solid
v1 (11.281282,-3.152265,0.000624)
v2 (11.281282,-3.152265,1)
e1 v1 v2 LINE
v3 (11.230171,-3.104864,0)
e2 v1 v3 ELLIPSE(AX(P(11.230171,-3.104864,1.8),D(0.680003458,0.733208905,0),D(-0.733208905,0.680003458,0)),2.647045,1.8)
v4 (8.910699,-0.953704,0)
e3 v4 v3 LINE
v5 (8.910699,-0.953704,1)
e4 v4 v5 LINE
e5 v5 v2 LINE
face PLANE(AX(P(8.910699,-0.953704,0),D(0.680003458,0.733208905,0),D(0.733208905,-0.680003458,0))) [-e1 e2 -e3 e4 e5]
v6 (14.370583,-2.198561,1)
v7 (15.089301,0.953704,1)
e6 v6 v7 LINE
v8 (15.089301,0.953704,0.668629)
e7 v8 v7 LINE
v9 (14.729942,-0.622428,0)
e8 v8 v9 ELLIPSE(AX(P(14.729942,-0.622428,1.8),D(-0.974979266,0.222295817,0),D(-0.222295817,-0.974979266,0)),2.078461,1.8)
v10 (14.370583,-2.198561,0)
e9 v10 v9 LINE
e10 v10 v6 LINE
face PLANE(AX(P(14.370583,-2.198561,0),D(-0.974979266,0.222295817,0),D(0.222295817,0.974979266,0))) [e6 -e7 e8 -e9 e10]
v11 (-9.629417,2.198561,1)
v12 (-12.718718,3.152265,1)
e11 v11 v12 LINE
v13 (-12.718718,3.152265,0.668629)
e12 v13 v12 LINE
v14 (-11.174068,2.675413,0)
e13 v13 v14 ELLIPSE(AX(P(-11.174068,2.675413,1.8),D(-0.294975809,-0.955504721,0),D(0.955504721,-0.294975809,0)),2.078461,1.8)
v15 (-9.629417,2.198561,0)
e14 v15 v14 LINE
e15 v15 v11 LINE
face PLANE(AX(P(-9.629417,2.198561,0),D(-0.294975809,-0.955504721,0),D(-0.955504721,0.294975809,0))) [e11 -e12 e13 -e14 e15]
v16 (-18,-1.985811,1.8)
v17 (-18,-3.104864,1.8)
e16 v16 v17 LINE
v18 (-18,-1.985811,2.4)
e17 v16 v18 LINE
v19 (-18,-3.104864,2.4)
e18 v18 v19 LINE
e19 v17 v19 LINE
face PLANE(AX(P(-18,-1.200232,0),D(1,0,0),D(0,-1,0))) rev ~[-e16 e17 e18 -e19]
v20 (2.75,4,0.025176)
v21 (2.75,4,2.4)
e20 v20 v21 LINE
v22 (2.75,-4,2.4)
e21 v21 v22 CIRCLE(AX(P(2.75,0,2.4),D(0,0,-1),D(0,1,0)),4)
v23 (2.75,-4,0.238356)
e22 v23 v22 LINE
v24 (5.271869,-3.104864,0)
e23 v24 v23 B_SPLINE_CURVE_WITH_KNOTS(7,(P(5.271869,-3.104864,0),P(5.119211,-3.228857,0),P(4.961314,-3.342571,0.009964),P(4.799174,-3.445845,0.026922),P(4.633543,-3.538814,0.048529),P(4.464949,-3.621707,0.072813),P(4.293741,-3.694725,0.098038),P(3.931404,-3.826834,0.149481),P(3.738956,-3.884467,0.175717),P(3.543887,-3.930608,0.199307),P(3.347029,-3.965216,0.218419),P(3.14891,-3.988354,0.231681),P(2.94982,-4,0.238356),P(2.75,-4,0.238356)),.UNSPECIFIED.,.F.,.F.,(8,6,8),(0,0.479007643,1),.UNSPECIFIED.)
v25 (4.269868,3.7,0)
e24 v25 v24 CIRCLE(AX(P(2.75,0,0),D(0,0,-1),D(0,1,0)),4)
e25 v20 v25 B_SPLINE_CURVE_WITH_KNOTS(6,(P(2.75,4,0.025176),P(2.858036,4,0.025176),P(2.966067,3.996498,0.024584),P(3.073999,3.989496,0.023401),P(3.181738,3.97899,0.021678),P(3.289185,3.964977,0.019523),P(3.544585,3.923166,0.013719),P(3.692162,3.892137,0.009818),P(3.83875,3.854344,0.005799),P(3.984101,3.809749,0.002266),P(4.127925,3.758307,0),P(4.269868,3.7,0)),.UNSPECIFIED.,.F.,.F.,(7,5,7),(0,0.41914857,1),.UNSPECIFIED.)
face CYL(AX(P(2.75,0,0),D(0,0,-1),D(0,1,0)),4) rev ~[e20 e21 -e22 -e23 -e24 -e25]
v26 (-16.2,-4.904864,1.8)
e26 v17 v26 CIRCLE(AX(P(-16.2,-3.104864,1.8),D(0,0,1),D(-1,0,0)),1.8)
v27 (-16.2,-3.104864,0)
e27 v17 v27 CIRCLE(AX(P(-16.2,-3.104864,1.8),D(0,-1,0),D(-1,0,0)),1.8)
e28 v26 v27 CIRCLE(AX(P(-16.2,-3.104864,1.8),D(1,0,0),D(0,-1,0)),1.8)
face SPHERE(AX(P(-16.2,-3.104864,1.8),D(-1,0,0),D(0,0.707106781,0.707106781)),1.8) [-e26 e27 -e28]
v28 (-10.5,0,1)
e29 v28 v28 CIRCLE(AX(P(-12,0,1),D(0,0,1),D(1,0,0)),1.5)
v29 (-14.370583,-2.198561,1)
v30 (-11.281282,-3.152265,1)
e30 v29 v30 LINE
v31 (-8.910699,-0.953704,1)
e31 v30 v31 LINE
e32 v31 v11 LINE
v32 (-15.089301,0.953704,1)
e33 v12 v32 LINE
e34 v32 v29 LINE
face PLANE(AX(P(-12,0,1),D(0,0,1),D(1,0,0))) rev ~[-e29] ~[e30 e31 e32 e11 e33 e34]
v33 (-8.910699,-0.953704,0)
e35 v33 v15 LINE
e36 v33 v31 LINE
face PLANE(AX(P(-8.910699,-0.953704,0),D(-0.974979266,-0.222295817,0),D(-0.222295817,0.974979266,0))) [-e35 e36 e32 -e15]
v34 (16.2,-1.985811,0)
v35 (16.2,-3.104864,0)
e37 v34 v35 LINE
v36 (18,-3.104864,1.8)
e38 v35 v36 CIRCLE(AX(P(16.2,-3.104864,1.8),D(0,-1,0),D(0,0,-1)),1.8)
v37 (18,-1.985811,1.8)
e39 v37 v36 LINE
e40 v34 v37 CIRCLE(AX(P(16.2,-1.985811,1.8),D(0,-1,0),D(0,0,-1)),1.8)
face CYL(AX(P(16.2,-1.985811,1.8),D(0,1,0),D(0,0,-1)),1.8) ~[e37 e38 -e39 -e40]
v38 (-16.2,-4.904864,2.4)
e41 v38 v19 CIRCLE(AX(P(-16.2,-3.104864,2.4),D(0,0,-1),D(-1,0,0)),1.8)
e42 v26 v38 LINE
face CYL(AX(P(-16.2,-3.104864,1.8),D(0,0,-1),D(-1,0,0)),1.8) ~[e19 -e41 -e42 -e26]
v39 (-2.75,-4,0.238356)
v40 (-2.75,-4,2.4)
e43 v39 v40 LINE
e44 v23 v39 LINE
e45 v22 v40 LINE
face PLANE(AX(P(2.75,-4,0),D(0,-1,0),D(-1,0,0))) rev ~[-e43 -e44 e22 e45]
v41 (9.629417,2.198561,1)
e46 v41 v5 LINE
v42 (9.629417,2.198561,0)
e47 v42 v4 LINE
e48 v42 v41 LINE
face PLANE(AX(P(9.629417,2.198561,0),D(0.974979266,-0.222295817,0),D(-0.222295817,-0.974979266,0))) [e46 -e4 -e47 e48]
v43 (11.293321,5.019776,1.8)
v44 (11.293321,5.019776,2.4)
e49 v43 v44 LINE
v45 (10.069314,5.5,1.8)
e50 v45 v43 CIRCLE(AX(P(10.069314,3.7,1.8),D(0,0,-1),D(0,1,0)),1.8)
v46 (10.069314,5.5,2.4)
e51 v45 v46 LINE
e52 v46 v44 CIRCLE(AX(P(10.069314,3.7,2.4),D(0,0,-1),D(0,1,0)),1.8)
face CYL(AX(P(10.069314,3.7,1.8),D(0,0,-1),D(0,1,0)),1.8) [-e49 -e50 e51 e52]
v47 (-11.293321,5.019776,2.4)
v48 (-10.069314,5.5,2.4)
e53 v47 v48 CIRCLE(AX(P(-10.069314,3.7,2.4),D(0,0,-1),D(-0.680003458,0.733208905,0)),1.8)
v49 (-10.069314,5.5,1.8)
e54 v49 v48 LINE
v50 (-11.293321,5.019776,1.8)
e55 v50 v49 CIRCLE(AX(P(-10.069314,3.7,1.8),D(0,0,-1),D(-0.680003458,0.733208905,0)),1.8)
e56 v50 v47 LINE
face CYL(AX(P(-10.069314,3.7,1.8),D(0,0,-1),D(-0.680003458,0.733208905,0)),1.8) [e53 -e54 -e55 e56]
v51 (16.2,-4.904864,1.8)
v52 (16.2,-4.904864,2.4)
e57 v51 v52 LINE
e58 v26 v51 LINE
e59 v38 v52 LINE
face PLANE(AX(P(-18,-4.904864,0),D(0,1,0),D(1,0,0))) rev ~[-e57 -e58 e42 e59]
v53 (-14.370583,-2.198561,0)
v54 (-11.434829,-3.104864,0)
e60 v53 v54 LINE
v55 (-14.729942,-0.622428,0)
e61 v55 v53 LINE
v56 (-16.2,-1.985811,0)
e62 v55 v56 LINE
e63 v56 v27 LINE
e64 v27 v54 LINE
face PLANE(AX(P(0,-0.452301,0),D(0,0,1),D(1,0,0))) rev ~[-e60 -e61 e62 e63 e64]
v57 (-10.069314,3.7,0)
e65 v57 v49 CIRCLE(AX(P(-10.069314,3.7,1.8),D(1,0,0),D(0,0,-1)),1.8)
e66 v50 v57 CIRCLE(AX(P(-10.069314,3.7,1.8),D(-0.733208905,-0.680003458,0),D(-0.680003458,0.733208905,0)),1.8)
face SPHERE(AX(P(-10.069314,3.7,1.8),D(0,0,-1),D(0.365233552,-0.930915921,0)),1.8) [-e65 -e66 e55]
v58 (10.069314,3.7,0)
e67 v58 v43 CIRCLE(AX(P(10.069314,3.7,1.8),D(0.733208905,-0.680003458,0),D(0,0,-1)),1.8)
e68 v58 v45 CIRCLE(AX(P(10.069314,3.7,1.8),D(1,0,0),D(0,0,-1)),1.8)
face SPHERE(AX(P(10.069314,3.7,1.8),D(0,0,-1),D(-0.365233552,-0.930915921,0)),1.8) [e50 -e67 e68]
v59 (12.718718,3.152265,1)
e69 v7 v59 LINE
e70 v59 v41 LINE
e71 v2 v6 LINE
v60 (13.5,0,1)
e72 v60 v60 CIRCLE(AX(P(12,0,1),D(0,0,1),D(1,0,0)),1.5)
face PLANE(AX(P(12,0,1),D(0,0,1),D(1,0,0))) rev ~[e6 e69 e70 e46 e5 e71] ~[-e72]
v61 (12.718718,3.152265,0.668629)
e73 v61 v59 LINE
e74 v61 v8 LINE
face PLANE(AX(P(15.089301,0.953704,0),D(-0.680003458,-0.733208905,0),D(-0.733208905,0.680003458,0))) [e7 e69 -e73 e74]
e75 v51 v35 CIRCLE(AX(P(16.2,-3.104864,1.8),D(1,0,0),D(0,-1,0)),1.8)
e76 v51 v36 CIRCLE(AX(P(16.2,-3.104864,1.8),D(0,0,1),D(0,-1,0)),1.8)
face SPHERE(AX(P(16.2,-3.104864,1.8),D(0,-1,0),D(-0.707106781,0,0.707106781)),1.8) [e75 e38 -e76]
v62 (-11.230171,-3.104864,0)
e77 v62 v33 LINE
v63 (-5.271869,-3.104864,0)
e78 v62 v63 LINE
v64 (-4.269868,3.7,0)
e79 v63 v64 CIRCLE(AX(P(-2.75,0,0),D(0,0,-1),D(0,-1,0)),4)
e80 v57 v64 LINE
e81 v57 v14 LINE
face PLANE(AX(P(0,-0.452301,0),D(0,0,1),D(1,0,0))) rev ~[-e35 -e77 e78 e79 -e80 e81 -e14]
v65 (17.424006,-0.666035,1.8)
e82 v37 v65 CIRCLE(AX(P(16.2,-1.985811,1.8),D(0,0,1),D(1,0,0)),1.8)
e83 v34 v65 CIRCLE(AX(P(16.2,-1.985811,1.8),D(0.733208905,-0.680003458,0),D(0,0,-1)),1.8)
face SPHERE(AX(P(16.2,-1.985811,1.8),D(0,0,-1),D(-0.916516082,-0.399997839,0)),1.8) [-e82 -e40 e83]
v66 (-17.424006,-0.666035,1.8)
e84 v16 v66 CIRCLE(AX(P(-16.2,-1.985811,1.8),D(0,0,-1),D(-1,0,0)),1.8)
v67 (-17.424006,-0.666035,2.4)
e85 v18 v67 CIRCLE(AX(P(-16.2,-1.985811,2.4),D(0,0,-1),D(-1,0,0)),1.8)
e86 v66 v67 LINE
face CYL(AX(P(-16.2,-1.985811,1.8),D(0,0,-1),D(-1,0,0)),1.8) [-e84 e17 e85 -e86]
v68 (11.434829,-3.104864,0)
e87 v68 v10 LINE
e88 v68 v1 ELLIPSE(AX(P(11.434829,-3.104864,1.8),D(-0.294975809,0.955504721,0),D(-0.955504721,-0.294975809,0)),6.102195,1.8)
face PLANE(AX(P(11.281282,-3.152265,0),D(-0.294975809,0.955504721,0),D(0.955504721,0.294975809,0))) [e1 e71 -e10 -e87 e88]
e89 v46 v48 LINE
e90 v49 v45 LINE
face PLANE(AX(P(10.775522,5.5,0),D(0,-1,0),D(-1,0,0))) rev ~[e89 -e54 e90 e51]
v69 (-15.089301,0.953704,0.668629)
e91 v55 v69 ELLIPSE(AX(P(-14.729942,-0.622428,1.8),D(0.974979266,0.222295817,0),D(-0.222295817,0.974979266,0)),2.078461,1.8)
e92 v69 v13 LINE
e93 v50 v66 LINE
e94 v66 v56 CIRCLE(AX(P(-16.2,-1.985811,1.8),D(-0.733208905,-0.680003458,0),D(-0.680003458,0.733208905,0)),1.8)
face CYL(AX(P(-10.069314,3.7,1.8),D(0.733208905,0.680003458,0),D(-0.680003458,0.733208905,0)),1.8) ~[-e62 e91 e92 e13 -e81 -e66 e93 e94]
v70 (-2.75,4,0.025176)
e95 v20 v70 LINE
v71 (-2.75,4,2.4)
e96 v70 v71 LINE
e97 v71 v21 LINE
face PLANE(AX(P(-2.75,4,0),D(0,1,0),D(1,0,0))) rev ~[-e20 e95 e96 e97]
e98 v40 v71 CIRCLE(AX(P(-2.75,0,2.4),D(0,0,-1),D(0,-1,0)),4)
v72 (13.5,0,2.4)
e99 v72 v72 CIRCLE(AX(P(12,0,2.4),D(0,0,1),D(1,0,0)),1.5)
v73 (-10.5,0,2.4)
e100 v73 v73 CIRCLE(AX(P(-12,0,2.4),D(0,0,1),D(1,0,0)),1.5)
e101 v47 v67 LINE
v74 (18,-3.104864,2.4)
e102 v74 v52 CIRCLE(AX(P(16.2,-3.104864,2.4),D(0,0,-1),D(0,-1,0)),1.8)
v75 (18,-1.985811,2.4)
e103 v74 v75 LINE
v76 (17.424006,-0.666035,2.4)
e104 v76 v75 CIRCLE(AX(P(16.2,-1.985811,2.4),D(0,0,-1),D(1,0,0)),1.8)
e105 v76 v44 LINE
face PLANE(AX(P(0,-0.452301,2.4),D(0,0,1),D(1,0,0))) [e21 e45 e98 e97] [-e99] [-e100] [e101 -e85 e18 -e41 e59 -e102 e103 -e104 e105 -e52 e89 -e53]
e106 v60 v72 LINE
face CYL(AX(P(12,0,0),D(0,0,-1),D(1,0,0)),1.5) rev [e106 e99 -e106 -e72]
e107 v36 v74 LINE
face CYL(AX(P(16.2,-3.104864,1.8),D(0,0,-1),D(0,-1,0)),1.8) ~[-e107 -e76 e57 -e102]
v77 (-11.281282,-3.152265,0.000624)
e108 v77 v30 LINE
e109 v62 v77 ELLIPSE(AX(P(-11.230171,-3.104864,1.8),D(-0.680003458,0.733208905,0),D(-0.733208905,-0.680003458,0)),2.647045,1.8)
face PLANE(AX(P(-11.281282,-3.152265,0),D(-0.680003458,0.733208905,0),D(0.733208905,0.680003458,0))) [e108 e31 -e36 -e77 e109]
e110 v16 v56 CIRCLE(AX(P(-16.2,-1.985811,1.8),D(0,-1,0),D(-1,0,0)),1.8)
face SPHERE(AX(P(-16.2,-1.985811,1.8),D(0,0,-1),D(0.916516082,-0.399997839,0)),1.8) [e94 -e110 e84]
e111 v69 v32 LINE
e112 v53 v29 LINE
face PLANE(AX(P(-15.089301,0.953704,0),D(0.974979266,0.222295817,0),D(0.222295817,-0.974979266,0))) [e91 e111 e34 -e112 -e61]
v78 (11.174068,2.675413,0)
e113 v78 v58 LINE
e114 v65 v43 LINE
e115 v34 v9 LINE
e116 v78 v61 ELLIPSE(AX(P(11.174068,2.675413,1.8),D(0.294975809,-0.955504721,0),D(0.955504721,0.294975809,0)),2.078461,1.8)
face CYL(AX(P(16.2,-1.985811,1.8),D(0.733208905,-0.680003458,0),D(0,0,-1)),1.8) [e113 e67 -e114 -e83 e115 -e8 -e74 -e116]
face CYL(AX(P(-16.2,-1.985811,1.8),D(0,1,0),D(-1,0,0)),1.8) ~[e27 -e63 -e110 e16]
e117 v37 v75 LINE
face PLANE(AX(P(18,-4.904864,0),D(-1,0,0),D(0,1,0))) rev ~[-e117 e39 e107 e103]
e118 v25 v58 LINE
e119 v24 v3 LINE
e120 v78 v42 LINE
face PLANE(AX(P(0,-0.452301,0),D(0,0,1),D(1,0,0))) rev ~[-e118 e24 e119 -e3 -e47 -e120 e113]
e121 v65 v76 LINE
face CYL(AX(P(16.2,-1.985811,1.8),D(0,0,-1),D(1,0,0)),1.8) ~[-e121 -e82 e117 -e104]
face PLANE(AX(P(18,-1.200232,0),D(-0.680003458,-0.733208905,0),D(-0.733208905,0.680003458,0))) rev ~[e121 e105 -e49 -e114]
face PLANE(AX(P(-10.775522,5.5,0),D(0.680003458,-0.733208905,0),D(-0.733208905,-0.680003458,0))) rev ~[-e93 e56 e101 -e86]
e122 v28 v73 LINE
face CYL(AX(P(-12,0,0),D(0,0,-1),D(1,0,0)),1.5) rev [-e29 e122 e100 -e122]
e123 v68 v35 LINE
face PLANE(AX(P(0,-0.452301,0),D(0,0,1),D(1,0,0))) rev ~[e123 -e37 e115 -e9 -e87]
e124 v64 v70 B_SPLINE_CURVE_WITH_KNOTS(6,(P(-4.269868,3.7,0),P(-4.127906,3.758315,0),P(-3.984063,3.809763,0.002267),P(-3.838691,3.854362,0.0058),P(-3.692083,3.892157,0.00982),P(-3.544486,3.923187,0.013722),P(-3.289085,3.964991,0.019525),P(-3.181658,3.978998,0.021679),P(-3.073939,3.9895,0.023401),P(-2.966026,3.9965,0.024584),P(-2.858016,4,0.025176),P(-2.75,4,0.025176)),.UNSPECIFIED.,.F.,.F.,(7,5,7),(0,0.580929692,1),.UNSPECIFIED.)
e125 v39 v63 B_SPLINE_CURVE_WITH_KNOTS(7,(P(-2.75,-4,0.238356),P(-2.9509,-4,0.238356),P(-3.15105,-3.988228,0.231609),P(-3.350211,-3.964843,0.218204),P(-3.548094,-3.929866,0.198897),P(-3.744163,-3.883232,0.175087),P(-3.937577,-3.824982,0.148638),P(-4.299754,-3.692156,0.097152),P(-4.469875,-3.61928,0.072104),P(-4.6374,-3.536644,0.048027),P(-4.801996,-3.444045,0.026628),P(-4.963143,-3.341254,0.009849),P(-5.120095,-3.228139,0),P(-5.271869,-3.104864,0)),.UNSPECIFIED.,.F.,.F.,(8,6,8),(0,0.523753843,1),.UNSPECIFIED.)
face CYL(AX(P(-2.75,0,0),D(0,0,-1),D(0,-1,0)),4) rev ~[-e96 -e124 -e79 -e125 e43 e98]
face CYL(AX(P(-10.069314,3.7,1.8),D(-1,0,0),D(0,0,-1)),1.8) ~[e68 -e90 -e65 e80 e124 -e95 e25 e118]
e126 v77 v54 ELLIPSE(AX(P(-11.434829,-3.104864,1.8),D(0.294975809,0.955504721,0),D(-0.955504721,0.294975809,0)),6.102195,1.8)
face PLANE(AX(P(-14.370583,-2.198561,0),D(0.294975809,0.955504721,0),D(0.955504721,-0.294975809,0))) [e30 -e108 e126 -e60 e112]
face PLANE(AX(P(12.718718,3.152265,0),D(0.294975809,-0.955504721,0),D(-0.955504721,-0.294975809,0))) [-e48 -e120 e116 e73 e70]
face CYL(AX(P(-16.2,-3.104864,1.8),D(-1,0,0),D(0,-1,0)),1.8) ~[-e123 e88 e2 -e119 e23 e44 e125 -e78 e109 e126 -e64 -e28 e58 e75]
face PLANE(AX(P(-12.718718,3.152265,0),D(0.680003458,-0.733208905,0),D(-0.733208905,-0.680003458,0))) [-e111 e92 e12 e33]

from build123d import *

# Parameters (mm, degrees)
F0_R         = 1.5
F1_DEPTH     = 2.4
F2_DEPTH     = 1
F3_T1_DEPTH  = 1.1190522621
F3_T3_DEPTH  = 32.4
F3_T5_DEPTH  = 20.138628613
F3_T7_DEPTH  = 2.365520331
F3_T9_DEPTH  = 8.3614446785
F3_T11_DEPTH = 8.3614446785
F3_T13_DEPTH = 5.1
F3_T15_DEPTH = 2.5639483811
F3_T20_DEPTH = 1.8
F3_S25_W     = 1.8
F3_S25_H     = 1.8
F3_T26_DEPTH = 1.8
F3_S31_W     = 1.8
F3_S31_H     = 1.8
F3_T32_DEPTH = 1.8
F3_T38_DEPTH = 1.8
F3_T44_DEPTH = 1.8
F3_T50_DEPTH = 1.8


# Not quite as in the source:
# - a fillet or chamfer that OpenCascade refuses, or shapes differently, is made with other operations: its cross-section is extruded or revolved along the edge and cut away or added


with BuildPart() as f1:
    # F0 (on Top) → F1 (new body)
    with BuildSketch(Plane.XY):
        Polygon((-18, -1.2002319389), (-18, -4.9048635534), (18, -4.9048635534), (18, -1.2002319389), (10.7755224389, 5.5), (-10.7755224389, 5.5), align=None)
        Polygon((-9.6294171928, 2.1985610038), (-8.9106989153, -0.9537044309), (-11.2812817225, -3.1522654347), (-14.3705828072, -2.1985610038), (-15.0893010847, 0.9537044309), (-12.7187182775, 3.1522654347), align=None, mode=Mode.SUBTRACT)
        with BuildLine():
            ThreePointArc((-2.75, -4), (-6.75, 0), (-2.75, 4))
            Line((-2.75, 4), (2.75, 4))
            ThreePointArc((2.75, 4), (6.75, 0), (2.75, -4))
            Line((2.75, -4), (-2.75, -4))
        make_face(mode=Mode.SUBTRACT)
        Polygon((9.6294171928, 2.1985610038), (12.7187182775, 3.1522654347), (15.0893010847, 0.9537044309), (14.3705828072, -2.1985610038), (11.2812817225, -3.1522654347), (8.9106989153, -0.9537044309), align=None, mode=Mode.SUBTRACT)
        Polygon((-11.2812817225, -3.1522654347), (-8.9106989153, -0.9537044309), (-9.6294171928, 2.1985610038), (-12.7187182775, 3.1522654347), (-15.0893010847, 0.9537044309), (-14.3705828072, -2.1985610038), align=None)
        with Locations((-12, 0)):
            Circle(F0_R, mode=Mode.SUBTRACT)
        Polygon((15.0893010847, 0.9537044309), (12.7187182775, 3.1522654347), (9.6294171928, 2.1985610038), (8.9106989153, -0.9537044309), (11.2812817225, -3.1522654347), (14.3705828072, -2.1985610038), align=None)
        with Locations((12, 0)):
            Circle(F0_R, mode=Mode.SUBTRACT)
    extrude(amount=F1_DEPTH)

    # F0 (on Top) → F2 (cut)
    with BuildSketch(Plane.XY):
        Polygon((15.0893010847, 0.9537044309), (12.7187182775, 3.1522654347), (9.6294171928, 2.1985610038), (8.9106989153, -0.9537044309), (11.2812817225, -3.1522654347), (14.3705828072, -2.1985610038), align=None)
        with Locations((12, 0)):
            Circle(F0_R, mode=Mode.SUBTRACT)
        Polygon((-11.2812817225, -3.1522654347), (-8.9106989153, -0.9537044309), (-9.6294171928, 2.1985610038), (-12.7187182775, 3.1522654347), (-15.0893010847, 0.9537044309), (-14.3705828072, -2.1985610038), align=None)
        with Locations((-12, 0)):
            Circle(F0_R, mode=Mode.SUBTRACT)
    extrude(amount=F2_DEPTH, mode=Mode.SUBTRACT)

    # F3: fillet of radius 1.8 on 12 edges, made by hand

    # F3_s2 → F3_t1 (cut)
    with BuildSketch(Plane.XZ.offset(1.9858112913)):
        with BuildLine():
            ThreePointArc((-18, 1.8), (-17.4727922061, 0.5272077939), (-16.2, 0))
            Line((-16.2, 0), (-18, 0))
            Line((-18, 0), (-18, 1.8))
        make_face()
        with BuildLine():
            ThreePointArc((16.2, 0), (17.4727922061, 0.5272077939), (18, 1.8))
            Line((18, 1.8), (18, 0))
            Line((18, 0), (16.2, 0))
        make_face()
    extrude(amount=F3_T1_DEPTH, mode=Mode.SUBTRACT)

    # F3_s4 → F3_t3 (cut)
    with BuildSketch(Plane.YZ.offset(-16.2)):
        with BuildLine():
            ThreePointArc((-4.9048635534, 1.8), (-4.3776557595, 0.5272077939), (-3.1048635534, 0))
            Line((-3.1048635534, 0), (-4.9048635534, 0))
            Line((-4.9048635534, 0), (-4.9048635534, 1.8))
        make_face()
    extrude(amount=F3_T3_DEPTH, mode=Mode.SUBTRACT)

    # F3_s6 → F3_t5 (cut)
    with BuildSketch(Plane.YZ.offset(-10.0693143065)):
        with BuildLine():
            ThreePointArc((3.7, 0), (4.9727922061, 0.5272077939), (5.5, 1.8))
            Line((5.5, 1.8), (5.5, 0))
            Line((5.5, 0), (3.7, 0))
        make_face()
    extrude(amount=F3_T5_DEPTH, mode=Mode.SUBTRACT)

    # F3_s8 → F3_t7 (cut)
    with BuildSketch(Plane.XY.offset(1.8)):
        with BuildLine():
            ThreePointArc((10.0693143065, 5.5), (10.7267347006, 5.3756486581), (11.2933205301, 5.0197760282))
            Line((11.2933205301, 5.0197760282), (10.7755224389, 5.5))
            Line((10.7755224389, 5.5), (10.0693143065, 5.5))
        make_face()
        with BuildLine():
            ThreePointArc((-11.2933205301, 5.0197760282), (-10.7267347006, 5.3756486581), (-10.0693143065, 5.5))
            Line((-10.0693143065, 5.5), (-10.7755224389, 5.5))
            Line((-10.7755224389, 5.5), (-11.2933205301, 5.0197760282))
        make_face()
    extrude(amount=F3_T7_DEPTH, mode=Mode.SUBTRACT)

    # F3_s10 → F3_t9 (cut)
    with BuildSketch(Plane(origin=(-3.5684530391, -3.3095075488, 0), x_dir=(0, 0, 1), z_dir=(-0.7332089046, -0.6800034575, 0))):
        with BuildLine():
            ThreePointArc((1.8, 11.3600414903), (0.5272077939, 10.8328336964), (0, 9.5600414903))
            Line((0, 9.5600414903), (0, 11.3600414903))
            Line((0, 11.3600414903), (1.8, 11.3600414903))
        make_face()
    extrude(amount=F3_T9_DEPTH, mode=Mode.SUBTRACT)

    # F3_s12 → F3_t11 (cut)
    with BuildSketch(Plane(origin=(9.6991387326, -8.9953188401, 0), x_dir=(0, 0, 1), z_dir=(-0.7332089046, 0.6800034575, 0))):
        with BuildLine():
            ThreePointArc((0, 9.5600414903), (0.5272077939, 10.8328336964), (1.8, 11.3600414903))
            Line((1.8, 11.3600414903), (0, 11.3600414903))
            Line((0, 11.3600414903), (0, 9.5600414903))
        make_face()
    extrude(amount=F3_T11_DEPTH, mode=Mode.SUBTRACT)

    # F3_s14 → F3_t13 (cut)
    with BuildSketch(Plane.XY.offset(1.8)):
        with BuildLine():
            ThreePointArc((-18, -3.1048635534), (-17.4727922061, -4.3776557595), (-16.2, -4.9048635534))
            Line((-16.2, -4.9048635534), (-18, -4.9048635534))
            Line((-18, -4.9048635534), (-18, -3.1048635534))
        make_face()
        with BuildLine():
            ThreePointArc((16.2, -4.9048635534), (17.4727922061, -4.3776557595), (18, -3.1048635534))
            Line((18, -3.1048635534), (18, -4.9048635534))
            Line((18, -4.9048635534), (16.2, -4.9048635534))
        make_face()
    extrude(amount=F3_T13_DEPTH, mode=Mode.SUBTRACT)

    # F3_s16 → F3_t15 (cut)
    with BuildSketch(Plane.XY.offset(1.8)):
        with BuildLine():
            ThreePointArc((-18, -1.9858112913), (-17.8497289478, -1.265815181), (-17.4240062235, -0.666035263))
            Line((-17.4240062235, -0.666035263), (-18, -1.2002319389))
            Line((-18, -1.2002319389), (-18, -1.9858112913))
        make_face()
        with BuildLine():
            ThreePointArc((18, -1.9858112913), (17.8497289478, -1.265815181), (17.4240062235, -0.666035263))
            Line((17.4240062235, -0.666035263), (18, -1.2002319389))
            Line((18, -1.2002319389), (18, -1.9858112913))
        make_face()
    extrude(amount=F3_T15_DEPTH, mode=Mode.SUBTRACT)


with BuildPart() as f3_tool18:
    # F3_s19 → F3_t20 (new body)
    with BuildSketch(Plane.XY.offset(1.8)):
        Polygon((-16.2, -1.9858112913), (-18, -1.9858112913), (-18, -1.2002319389), (-17.4240062235, -0.666035263), align=None)
    extrude(amount=-F3_T20_DEPTH)

    # F3_s21 → F3_t22 (revolve, cut)
    with BuildSketch(Plane(origin=(-16.2, -1.9858112913, 1.8), x_dir=(0.9165160821, -0.399997839, 0), z_dir=(0.399997839, 0.9165160821, 0))):
        with BuildLine():
            ThreePointArc((0, -1.8), (1.8, 0), (0, 1.8))
            Line((0, 1.8), (0, -1.8))
        make_face()
    revolve(axis=Axis((-16.2, -1.9858112913, 1.8), (0, 0, -1)), mode=Mode.SUBTRACT)


with BuildPart() as f1_1:
    add(f1.part)

    # F3_t17: cut F3_tool18
    add(f3_tool18.part, mode=Mode.SUBTRACT)


with BuildPart() as f3_tool24:
    # F3_s25 → F3_t26 (new body)
    with BuildSketch(Plane.YZ.offset(-16.2)):
        with Locations((-4.0048635534, 0.9)):
            Rectangle(F3_S25_W, F3_S25_H)
    extrude(amount=-F3_T26_DEPTH)

    # F3_s27 → F3_t28 (revolve, cut)
    with BuildSketch(Plane(origin=(-16.2, -3.1048635534, 1.8), x_dir=(0, 0.7071067812, 0.7071067812), z_dir=(0, -0.7071067812, 0.7071067812))):
        with BuildLine():
            ThreePointArc((0, -1.8), (1.8, 0), (0, 1.8))
            Line((0, 1.8), (0, -1.8))
        make_face()
    revolve(axis=Axis((-16.2, -3.1048635534, 1.8), (-1, 0, 0)), mode=Mode.SUBTRACT)


with BuildPart() as f1_2:
    add(f1_1.part)

    # F3_t23: cut F3_tool24
    add(f3_tool24.part, mode=Mode.SUBTRACT)


with BuildPart() as f3_tool30:
    # F3_s31 → F3_t32 (new body)
    with BuildSketch(Plane.XZ.offset(3.1048635534)):
        with Locations((17.1, 0.9)):
            Rectangle(F3_S31_W, F3_S31_H)
    extrude(amount=F3_T32_DEPTH)

    # F3_s33 → F3_t34 (revolve, cut)
    with BuildSketch(Plane(origin=(16.2, -3.1048635534, 1.8), x_dir=(-0.7071067812, 0, 0.7071067812), z_dir=(0.7071067812, 0, 0.7071067812))):
        with BuildLine():
            ThreePointArc((0, -1.8), (1.8, 0), (0, 1.8))
            Line((0, 1.8), (0, -1.8))
        make_face()
    revolve(axis=Axis((16.2, -3.1048635534, 1.8), (0, -1, 0)), mode=Mode.SUBTRACT)


with BuildPart() as f1_3:
    add(f1_2.part)

    # F3_t29: cut F3_tool30
    add(f3_tool30.part, mode=Mode.SUBTRACT)


with BuildPart() as f3_tool36:
    # F3_s37 → F3_t38 (new body)
    with BuildSketch(Plane.XY.offset(1.8)):
        Polygon((16.2, -1.9858112913), (18, -1.9858112913), (18, -1.2002319389), (17.4240062235, -0.666035263), align=None)
    extrude(amount=-F3_T38_DEPTH)

    # F3_s39 → F3_t40 (revolve, cut)
    with BuildSketch(Plane(origin=(16.2, -1.9858112913, 1.8), x_dir=(-0.9165160821, -0.399997839, 0), z_dir=(0.399997839, -0.9165160821, 0))):
        with BuildLine():
            ThreePointArc((0, -1.8), (1.8, 0), (0, 1.8))
            Line((0, 1.8), (0, -1.8))
        make_face()
    revolve(axis=Axis((16.2, -1.9858112913, 1.8), (0, 0, -1)), mode=Mode.SUBTRACT)


with BuildPart() as f1_4:
    add(f1_3.part)

    # F3_t35: cut F3_tool36
    add(f3_tool36.part, mode=Mode.SUBTRACT)


with BuildPart() as f3_tool42:
    # F3_s43 → F3_t44 (new body)
    with BuildSketch(Plane.XY.offset(1.8)):
        Polygon((10.0693143065, 3.7), (10.0693143065, 5.5), (10.7755224389, 5.5), (11.2933205301, 5.0197760282), align=None)
    extrude(amount=-F3_T44_DEPTH)

    # F3_s45 → F3_t46 (revolve, cut)
    with BuildSketch(Plane(origin=(10.0693143065, 3.7, 1.8), x_dir=(-0.3652335523, -0.9309159212, 0), z_dir=(0.9309159212, -0.3652335523, 0))):
        with BuildLine():
            ThreePointArc((0, -1.8), (1.8, 0), (0, 1.8))
            Line((0, 1.8), (0, -1.8))
        make_face()
    revolve(axis=Axis((10.0693143065, 3.7, 1.8), (0, 0, -1)), mode=Mode.SUBTRACT)


with BuildPart() as f1_5:
    add(f1_4.part)

    # F3_t41: cut F3_tool42
    add(f3_tool42.part, mode=Mode.SUBTRACT)


with BuildPart() as f3_tool48:
    # F3_s49 → F3_t50 (new body)
    with BuildSketch(Plane.XY.offset(1.8)):
        Polygon((-10.0693143065, 3.7), (-10.0693143065, 5.5), (-10.7755224389, 5.5), (-11.2933205301, 5.0197760282), align=None)
    extrude(amount=-F3_T50_DEPTH)

    # F3_s51 → F3_t52 (revolve, cut)
    with BuildSketch(Plane(origin=(-10.0693143065, 3.7, 1.8), x_dir=(0.3652335523, -0.9309159212, 0), z_dir=(0.9309159212, 0.3652335523, 0))):
        with BuildLine():
            ThreePointArc((0, -1.8), (1.8, 0), (0, 1.8))
            Line((0, 1.8), (0, -1.8))
        make_face()
    revolve(axis=Axis((-10.0693143065, 3.7, 1.8), (0, 0, -1)), mode=Mode.SUBTRACT)


with BuildPart() as f1_6:
    add(f1_5.part)

    # F3_t47: cut F3_tool48
    add(f3_tool48.part, mode=Mode.SUBTRACT)


solid = f1_6.part
